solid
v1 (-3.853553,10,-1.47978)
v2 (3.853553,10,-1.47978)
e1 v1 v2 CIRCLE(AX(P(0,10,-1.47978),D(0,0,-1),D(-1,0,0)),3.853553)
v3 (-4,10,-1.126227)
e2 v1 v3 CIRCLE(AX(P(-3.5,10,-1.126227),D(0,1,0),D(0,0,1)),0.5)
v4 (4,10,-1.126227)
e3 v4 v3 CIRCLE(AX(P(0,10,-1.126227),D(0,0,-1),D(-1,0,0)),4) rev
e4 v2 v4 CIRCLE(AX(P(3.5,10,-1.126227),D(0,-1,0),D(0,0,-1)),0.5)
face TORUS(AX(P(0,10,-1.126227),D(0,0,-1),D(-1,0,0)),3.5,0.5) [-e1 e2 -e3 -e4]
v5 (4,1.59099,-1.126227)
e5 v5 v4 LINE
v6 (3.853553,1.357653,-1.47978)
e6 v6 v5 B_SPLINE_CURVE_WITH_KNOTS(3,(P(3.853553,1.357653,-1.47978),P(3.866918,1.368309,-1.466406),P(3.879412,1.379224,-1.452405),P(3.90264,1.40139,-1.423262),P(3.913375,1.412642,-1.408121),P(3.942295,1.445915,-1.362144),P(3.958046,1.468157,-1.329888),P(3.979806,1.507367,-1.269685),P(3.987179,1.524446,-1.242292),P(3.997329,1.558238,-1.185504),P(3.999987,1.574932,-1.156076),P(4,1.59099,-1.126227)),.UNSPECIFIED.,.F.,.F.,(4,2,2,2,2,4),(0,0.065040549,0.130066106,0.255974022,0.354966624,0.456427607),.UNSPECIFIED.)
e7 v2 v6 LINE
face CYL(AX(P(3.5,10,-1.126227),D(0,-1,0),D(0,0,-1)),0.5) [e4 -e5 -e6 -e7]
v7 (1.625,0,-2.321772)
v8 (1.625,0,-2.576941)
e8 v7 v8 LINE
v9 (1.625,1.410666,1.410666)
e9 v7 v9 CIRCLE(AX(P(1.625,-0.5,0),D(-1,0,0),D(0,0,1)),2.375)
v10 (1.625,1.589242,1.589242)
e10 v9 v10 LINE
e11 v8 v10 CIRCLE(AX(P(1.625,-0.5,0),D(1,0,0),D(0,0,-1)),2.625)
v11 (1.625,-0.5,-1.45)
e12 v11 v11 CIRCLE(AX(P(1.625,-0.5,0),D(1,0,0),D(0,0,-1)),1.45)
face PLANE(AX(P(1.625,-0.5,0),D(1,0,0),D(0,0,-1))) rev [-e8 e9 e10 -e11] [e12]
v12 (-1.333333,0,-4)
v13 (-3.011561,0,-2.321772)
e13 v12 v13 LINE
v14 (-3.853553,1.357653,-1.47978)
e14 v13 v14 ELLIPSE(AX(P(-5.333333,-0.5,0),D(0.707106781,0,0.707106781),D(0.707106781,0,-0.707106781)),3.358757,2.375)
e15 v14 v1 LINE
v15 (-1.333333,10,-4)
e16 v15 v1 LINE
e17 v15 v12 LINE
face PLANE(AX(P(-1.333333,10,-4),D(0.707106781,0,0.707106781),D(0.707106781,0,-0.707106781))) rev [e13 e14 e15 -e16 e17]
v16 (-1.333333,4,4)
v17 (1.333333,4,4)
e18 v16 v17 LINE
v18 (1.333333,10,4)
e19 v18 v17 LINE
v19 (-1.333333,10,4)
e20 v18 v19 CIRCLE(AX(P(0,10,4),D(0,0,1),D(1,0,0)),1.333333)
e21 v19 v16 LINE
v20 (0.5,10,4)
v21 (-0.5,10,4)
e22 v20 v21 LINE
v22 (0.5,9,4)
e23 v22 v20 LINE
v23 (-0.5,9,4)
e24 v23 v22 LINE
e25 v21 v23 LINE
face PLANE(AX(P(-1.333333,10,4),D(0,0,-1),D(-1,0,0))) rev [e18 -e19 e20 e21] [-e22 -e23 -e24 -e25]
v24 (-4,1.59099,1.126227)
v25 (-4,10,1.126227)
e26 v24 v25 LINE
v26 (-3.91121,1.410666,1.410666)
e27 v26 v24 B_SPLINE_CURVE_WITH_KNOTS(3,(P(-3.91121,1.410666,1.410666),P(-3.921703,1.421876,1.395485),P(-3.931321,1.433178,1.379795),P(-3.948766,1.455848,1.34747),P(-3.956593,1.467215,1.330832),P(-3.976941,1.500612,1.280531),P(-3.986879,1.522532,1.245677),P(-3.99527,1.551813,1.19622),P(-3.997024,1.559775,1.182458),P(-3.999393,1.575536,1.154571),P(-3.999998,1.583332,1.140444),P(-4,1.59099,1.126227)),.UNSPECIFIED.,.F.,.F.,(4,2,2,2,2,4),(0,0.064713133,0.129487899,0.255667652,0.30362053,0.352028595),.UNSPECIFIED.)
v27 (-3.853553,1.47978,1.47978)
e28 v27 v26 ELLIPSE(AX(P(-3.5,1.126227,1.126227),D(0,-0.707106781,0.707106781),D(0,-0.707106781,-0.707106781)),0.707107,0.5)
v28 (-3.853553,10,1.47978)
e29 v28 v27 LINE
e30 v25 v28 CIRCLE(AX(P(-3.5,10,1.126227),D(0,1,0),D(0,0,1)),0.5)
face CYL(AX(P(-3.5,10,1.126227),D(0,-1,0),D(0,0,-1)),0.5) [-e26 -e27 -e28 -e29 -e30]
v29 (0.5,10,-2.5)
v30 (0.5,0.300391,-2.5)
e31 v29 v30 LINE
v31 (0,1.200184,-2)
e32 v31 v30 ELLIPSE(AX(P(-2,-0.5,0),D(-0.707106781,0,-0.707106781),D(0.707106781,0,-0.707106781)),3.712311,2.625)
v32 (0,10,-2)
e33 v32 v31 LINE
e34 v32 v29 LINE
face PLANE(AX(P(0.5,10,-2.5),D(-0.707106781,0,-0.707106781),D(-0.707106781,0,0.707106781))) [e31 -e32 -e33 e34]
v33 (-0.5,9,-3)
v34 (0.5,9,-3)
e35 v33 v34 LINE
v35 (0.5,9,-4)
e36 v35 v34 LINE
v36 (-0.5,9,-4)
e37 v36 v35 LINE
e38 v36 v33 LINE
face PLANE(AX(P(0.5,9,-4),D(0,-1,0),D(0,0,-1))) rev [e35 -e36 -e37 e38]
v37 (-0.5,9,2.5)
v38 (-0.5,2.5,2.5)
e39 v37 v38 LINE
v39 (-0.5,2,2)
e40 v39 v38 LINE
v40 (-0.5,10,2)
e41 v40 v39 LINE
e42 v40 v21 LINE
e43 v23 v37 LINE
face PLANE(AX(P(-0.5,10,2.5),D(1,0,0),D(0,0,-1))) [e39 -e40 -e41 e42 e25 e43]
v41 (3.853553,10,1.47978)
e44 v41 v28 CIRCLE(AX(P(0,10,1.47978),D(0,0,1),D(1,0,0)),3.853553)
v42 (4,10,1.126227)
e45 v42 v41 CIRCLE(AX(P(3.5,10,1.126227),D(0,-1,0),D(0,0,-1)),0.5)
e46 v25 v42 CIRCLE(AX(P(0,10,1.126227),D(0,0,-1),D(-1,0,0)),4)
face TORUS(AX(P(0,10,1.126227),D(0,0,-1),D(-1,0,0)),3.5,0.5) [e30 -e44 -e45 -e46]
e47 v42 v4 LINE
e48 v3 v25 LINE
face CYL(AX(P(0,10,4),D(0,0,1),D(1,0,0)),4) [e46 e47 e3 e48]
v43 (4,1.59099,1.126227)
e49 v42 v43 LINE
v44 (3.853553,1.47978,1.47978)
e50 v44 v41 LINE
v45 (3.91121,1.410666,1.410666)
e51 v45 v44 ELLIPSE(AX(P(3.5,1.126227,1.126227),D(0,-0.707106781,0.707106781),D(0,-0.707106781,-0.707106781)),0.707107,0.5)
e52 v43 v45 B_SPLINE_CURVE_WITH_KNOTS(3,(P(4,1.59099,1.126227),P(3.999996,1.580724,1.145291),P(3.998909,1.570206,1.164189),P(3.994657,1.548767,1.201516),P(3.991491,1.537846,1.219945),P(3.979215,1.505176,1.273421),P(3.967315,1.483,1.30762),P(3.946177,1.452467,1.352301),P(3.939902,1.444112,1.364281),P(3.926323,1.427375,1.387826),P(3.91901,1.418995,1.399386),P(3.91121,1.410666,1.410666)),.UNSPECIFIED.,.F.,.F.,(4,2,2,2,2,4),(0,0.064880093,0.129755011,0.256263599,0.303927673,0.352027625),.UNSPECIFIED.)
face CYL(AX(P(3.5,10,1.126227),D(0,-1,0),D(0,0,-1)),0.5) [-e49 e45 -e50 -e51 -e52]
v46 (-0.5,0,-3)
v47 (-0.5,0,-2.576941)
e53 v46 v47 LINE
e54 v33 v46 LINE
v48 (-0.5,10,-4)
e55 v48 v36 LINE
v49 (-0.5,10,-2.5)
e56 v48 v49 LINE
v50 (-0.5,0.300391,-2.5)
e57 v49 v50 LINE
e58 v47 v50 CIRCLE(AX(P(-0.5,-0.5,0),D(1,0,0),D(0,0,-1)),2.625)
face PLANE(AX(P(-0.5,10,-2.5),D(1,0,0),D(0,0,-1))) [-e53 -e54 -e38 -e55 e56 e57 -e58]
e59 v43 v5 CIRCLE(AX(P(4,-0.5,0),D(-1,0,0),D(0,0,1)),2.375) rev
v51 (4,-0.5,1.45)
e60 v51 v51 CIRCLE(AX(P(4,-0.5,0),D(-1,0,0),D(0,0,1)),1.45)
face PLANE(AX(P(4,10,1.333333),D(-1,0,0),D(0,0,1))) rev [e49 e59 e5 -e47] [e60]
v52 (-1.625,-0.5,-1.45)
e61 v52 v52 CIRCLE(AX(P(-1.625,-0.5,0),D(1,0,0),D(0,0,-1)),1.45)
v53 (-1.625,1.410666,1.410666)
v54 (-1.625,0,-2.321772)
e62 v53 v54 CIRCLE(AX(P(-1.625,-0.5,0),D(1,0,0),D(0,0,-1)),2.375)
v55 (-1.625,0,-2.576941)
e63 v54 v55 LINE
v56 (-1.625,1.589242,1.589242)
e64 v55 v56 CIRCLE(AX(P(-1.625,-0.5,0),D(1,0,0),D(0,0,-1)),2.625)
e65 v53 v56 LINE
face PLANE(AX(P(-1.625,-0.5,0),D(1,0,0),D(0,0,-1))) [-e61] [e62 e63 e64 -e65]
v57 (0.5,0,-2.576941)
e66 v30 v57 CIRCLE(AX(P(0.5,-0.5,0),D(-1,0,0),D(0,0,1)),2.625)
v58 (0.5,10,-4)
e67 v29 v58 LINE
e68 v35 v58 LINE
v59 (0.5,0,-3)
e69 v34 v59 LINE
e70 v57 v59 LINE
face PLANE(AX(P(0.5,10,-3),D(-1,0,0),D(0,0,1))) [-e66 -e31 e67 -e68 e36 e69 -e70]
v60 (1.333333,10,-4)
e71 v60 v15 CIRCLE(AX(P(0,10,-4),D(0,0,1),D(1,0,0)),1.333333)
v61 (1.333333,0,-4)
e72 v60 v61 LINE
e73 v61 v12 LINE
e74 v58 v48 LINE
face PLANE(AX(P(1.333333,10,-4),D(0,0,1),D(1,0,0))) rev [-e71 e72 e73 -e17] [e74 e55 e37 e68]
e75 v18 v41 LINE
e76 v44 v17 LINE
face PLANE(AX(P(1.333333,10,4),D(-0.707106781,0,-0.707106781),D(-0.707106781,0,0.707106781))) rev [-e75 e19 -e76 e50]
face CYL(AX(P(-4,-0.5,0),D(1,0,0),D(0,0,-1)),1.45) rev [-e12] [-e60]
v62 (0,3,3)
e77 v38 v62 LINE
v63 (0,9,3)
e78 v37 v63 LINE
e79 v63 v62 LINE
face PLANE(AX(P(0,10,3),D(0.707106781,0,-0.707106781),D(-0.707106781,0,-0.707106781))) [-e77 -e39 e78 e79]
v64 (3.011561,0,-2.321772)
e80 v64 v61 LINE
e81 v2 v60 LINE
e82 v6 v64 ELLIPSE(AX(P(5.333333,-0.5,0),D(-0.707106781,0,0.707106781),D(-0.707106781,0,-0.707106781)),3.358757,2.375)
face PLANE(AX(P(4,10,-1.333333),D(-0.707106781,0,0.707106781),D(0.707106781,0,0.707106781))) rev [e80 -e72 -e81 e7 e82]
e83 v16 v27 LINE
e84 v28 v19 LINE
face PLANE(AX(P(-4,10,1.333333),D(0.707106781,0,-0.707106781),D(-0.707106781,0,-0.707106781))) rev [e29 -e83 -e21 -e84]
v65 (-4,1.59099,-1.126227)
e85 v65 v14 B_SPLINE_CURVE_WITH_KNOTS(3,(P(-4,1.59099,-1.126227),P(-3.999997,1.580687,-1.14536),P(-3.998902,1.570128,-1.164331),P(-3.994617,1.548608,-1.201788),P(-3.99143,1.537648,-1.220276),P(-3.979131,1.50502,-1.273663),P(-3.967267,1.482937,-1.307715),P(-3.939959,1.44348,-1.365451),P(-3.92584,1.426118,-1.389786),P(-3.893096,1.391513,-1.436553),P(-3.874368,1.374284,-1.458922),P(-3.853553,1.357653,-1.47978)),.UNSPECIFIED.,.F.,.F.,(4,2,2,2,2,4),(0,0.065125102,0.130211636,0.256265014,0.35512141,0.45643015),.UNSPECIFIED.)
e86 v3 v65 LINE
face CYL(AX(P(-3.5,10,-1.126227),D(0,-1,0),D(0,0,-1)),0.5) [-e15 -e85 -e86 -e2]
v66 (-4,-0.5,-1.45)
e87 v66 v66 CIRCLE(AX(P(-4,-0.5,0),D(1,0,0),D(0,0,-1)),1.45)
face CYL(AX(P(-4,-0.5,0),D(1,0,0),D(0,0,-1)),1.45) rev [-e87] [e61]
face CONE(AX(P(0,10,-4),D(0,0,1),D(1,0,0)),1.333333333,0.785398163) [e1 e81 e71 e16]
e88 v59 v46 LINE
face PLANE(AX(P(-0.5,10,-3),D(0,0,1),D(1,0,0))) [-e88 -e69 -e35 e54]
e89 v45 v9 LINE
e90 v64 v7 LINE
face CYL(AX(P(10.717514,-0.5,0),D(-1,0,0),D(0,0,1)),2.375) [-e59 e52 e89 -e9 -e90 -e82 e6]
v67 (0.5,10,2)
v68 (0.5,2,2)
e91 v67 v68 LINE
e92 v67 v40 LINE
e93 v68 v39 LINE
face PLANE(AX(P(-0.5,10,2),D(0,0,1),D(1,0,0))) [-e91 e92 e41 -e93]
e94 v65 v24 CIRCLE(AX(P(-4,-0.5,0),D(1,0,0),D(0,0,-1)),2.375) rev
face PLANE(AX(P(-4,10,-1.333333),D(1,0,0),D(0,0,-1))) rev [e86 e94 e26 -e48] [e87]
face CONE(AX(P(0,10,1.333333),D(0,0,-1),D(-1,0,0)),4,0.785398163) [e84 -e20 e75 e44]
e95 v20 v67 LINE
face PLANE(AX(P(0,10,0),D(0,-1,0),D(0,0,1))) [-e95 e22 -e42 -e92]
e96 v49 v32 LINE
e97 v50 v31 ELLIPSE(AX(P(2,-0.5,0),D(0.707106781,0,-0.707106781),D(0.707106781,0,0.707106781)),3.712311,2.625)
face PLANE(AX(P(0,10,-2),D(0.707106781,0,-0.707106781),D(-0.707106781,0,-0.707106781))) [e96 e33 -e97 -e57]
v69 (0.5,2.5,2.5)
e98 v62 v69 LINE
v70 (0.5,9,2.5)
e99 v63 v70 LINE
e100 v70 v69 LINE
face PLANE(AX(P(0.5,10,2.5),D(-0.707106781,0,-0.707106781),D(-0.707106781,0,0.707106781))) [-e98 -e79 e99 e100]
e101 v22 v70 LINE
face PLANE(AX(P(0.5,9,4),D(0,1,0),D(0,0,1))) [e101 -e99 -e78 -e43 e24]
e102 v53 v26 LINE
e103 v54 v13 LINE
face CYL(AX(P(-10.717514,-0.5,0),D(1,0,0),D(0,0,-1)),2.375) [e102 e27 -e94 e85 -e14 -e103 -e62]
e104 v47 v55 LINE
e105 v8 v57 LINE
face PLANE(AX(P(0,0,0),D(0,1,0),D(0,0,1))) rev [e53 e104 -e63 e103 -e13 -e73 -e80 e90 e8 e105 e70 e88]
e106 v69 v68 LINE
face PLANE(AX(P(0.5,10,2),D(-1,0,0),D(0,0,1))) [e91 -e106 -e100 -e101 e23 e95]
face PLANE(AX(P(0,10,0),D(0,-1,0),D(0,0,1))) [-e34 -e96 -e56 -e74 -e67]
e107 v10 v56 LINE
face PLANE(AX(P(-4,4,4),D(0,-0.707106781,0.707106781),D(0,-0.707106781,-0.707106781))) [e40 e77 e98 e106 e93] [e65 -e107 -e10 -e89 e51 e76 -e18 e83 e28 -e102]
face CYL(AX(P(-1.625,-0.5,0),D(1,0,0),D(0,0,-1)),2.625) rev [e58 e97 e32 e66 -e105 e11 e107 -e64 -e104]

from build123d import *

# Parameters (mm, degrees)
BOSS_EXTRUDE1_DEPTH     = 10
CUT_EXTRUDE1_DEPTH      = 12.489125293
CUT_EXTRUDE1_DEPTH_BACK = 12.489125293
CUT_EXTRUDE2_DEPTH      = 10
SKETCH6_R               = 2.625
CUT_EXTRUDE4_DEPTH      = 1.625
BOSS_EXTRUDE3_REACH     = 14.151
SKETCH7_R               = 2.375
BOSS_EXTRUDE4_START     = -2.375
SKETCH8_R               = 2.375
BOSS_EXTRUDE4_DEPTH     = 2.375
CUT_EXTRUDE6_DEPTH      = 14.416407865
CUT_EXTRUDE6_DEPTH_BACK = 14.416407865
SKETCH11_R              = 1.45
REVOLVE1_ANGLE          = 180
FILLET1_R               = 0.5
FILLET2_R               = 0.5
SKETCH13_W              = 1
SKETCH13_H              = 1
CUT_EXTRUDE7_DEPTH      = 16.7480159
SKETCH14_W              = 1
SKETCH14_H              = 1
CUT_EXTRUDE8_DEPTH      = 17.155494533


with BuildPart() as part:
    # Sketch1 → Boss-Extrude1 (new body)
    with BuildSketch(Plane(origin=(0, 0, 0), x_dir=(1, 0, 0), z_dir=(0, 1, 0))):
        Polygon((-1.333333333, -4), (1.333333333, -4), (4, -1.333333333), (4, 1.333333333), (1.333333333, 4), (-1.333333333, 4), (-4, 1.333333333), (-4, -1.333333333), align=None)
    extrude(amount=BOSS_EXTRUDE1_DEPTH)

    # Sketch2 → Cut-Extrude1 (cut, two sides: drawn at the far end of the back side and taken through both)
    with BuildSketch(Plane(origin=(0, 0, 0), x_dir=(0, 0, -1), z_dir=(1, 0, 0)).offset(-CUT_EXTRUDE1_DEPTH_BACK)):
        Polygon((0, 0), (-4, 0), (-4, 4), align=None)
    extrude(amount=CUT_EXTRUDE1_DEPTH + CUT_EXTRUDE1_DEPTH_BACK, mode=Mode.SUBTRACT)

    # Sketch3 → Cut-Extrude2 (cut)
    with BuildSketch(Plane(origin=(0, 0, 0), x_dir=(1, 0, 0), z_dir=(0, 1, 0))):
        Polygon((0, -3), (-0.5, -2.5), (-0.5, -2), (0.5, -2), (0.5, -2.5), align=None)
        Polygon((0.5, 3), (0.5, 2.5), (0, 2), (-0.5, 2.5), (-0.5, 3), align=None)
    extrude(amount=CUT_EXTRUDE2_DEPTH, mode=Mode.SUBTRACT)

    # Sketch6 → Cut-Extrude4 (cut, symmetric)
    with BuildSketch(Plane(origin=(0, 0, 0), x_dir=(0, 0, -1), z_dir=(1, 0, 0))):
        with Locations((0, -0.5)):
            Circle(SKETCH6_R)
    extrude(amount=CUT_EXTRUDE4_DEPTH, both=True, mode=Mode.SUBTRACT)

    # Boss-Extrude3: up to this face of the body (flat: up to its plane)
    boss_extrude3_end = Plane(part.part.faces().sort_by_distance((-4, 5.157088123, -0.030651341))[0])
    # Sketch7 → Boss-Extrude3 (add, up to the picked face)
    with BuildSketch(Plane(origin=(-1.625, 0, 0), x_dir=(0, 0, -1), z_dir=(1, 0, 0)), mode=Mode.PRIVATE) as boss_extrude3_sk1:
        with Locations((0, -0.5)):
            Circle(SKETCH7_R)
    boss_extrude3_tool1 = split(extrude(boss_extrude3_sk1.sketch, amount=-BOSS_EXTRUDE3_REACH, mode=Mode.PRIVATE), bisect_by=boss_extrude3_end, keep=Keep.BOTH, mode=Mode.PRIVATE)
    add(boss_extrude3_tool1.solids().sort_by(Axis((-1.625, -0.5, 0), (-1, 0, 0)))[0])

    # Sketch8 → Boss-Extrude4 (add)
    with BuildSketch(Plane.ZY.offset(-1.625).offset(BOSS_EXTRUDE4_START)):
        with Locations((0, -0.5)):
            Circle(SKETCH8_R)
    extrude(amount=BOSS_EXTRUDE4_DEPTH)

    # Sketch11 → Cut-Extrude6 (cut, two sides: drawn at the far end of the back side and taken through both)
    with BuildSketch(Plane(origin=(4, 0, 0), x_dir=(0, 0, -1), z_dir=(1, 0, 0)).offset(-CUT_EXTRUDE6_DEPTH_BACK)):
        with Locations((0, -0.5)):
            Circle(SKETCH11_R)
    extrude(amount=CUT_EXTRUDE6_DEPTH + CUT_EXTRUDE6_DEPTH_BACK, mode=Mode.SUBTRACT)

    # Sketch12 → Revolve1 (revolve)
    with BuildSketch(Plane(origin=(0, 10, 0), x_dir=(1, 0, 0), z_dir=(0, 1, 0))):
        Polygon((0, 4), (-1.333333333, 4), (-4, 1.333333333), (-4, -1.333333333), (-1.333333333, -4), (0, -4), align=None)
    revolve(axis=Axis((0, 10, 4), (0, 0, -1)), revolution_arc=REVOLVE1_ANGLE)

    # Fillet1
    # the kernel refuses this fillet: 0.5 mm, written as the material it takes off along each edge
    with BuildSketch(Plane(origin=(4, 0.947645783, 1.333333333), x_dir=(-0.7071067811865454, 0, 0.7071067811865497), z_dir=(0, 1, 0))) as fillet1_piece_1_section:
        with BuildLine():
            CenterArc((FILLET1_R * 0.414213562373, -FILLET1_R), FILLET1_R, 90, 45)
            Line((-FILLET1_R * 0.292893218813, -FILLET1_R * 0.292893218813), (0, 0))
            Line((0, 0), (FILLET1_R * 0.414213562373, 0))
        make_face()
    fillet1_piece_1 = extrude(amount=9.052354217, mode=Mode.PRIVATE)
    fillet1_piece_1 = fillet1_piece_1 - Plane(origin=(3.968890647, -0.5, 0), x_dir=(0, 0, 1), z_dir=(1, 0, 0)) * Cylinder(2.375, 19, mode=Mode.PRIVATE)
    add(fillet1_piece_1, mode=Mode.SUBTRACT)
    with BuildSketch(Plane(origin=(-4, 0.947645783, 1.333333333), x_dir=(0, 0, -1), z_dir=(0, 1, 0))) as fillet1_piece_2_section:
        with BuildLine():
            CenterArc((FILLET1_R * 0.414213562373, -FILLET1_R), FILLET1_R, 90, 45)
            Line((-FILLET1_R * 0.292893218813, -FILLET1_R * 0.292893218813), (0, 0))
            Line((0, 0), (FILLET1_R * 0.414213562373, 0))
        make_face()
    fillet1_piece_2 = extrude(amount=9.052354217, mode=Mode.PRIVATE)
    fillet1_piece_2 = fillet1_piece_2 - Plane(origin=(-3.968890645, -0.5, 0), x_dir=(0, 0, -1), z_dir=(1, 0, 0)) * Cylinder(2.375, 19, mode=Mode.PRIVATE)
    add(fillet1_piece_2, mode=Mode.SUBTRACT)
    with BuildSketch(Plane(origin=(0, 10, 1.333333333), x_dir=(-1, 0, 0), z_dir=(0, -1, 0))) as fillet1_piece_3:
        with BuildLine():
            CenterArc((4 - FILLET1_R, FILLET1_R * 0.414213562373), FILLET1_R, 315, 45)
            Line((4 - FILLET1_R * 0.292893218813, -FILLET1_R * 0.292893218813), (4, 0))
            Line((4, 0), (4, FILLET1_R * 0.414213562373))
        make_face()
    revolve(axis=Axis((0, 10, 1.333333333), (0, 0, -1)), revolution_arc=180, mode=Mode.SUBTRACT)

    # Fillet2
    fillet2_edges = [part.edges().sort_by_distance(p)[0] for p in [
        (4, 5.732706368, -1.333333333),
        (-4, 5.732706368, -1.333333333),
        (0, 14, -1.333333333),
    ]]
    fillet(fillet2_edges, radius=FILLET2_R)

    # Sketch13 → Cut-Extrude7 (cut, through all)
    with BuildSketch(Plane.XY.offset(2)):
        with Locations((0, 9.5)):
            Rectangle(SKETCH13_W, SKETCH13_H)
    extrude(amount=CUT_EXTRUDE7_DEPTH, mode=Mode.SUBTRACT)

    # Sketch14 → Cut-Extrude8 (cut, through all)
    with BuildSketch(Plane.XY.offset(-3)):
        with Locations((0, 9.5)):
            Rectangle(SKETCH14_W, SKETCH14_H)
    extrude(amount=-CUT_EXTRUDE8_DEPTH, mode=Mode.SUBTRACT)


solid = part.part
